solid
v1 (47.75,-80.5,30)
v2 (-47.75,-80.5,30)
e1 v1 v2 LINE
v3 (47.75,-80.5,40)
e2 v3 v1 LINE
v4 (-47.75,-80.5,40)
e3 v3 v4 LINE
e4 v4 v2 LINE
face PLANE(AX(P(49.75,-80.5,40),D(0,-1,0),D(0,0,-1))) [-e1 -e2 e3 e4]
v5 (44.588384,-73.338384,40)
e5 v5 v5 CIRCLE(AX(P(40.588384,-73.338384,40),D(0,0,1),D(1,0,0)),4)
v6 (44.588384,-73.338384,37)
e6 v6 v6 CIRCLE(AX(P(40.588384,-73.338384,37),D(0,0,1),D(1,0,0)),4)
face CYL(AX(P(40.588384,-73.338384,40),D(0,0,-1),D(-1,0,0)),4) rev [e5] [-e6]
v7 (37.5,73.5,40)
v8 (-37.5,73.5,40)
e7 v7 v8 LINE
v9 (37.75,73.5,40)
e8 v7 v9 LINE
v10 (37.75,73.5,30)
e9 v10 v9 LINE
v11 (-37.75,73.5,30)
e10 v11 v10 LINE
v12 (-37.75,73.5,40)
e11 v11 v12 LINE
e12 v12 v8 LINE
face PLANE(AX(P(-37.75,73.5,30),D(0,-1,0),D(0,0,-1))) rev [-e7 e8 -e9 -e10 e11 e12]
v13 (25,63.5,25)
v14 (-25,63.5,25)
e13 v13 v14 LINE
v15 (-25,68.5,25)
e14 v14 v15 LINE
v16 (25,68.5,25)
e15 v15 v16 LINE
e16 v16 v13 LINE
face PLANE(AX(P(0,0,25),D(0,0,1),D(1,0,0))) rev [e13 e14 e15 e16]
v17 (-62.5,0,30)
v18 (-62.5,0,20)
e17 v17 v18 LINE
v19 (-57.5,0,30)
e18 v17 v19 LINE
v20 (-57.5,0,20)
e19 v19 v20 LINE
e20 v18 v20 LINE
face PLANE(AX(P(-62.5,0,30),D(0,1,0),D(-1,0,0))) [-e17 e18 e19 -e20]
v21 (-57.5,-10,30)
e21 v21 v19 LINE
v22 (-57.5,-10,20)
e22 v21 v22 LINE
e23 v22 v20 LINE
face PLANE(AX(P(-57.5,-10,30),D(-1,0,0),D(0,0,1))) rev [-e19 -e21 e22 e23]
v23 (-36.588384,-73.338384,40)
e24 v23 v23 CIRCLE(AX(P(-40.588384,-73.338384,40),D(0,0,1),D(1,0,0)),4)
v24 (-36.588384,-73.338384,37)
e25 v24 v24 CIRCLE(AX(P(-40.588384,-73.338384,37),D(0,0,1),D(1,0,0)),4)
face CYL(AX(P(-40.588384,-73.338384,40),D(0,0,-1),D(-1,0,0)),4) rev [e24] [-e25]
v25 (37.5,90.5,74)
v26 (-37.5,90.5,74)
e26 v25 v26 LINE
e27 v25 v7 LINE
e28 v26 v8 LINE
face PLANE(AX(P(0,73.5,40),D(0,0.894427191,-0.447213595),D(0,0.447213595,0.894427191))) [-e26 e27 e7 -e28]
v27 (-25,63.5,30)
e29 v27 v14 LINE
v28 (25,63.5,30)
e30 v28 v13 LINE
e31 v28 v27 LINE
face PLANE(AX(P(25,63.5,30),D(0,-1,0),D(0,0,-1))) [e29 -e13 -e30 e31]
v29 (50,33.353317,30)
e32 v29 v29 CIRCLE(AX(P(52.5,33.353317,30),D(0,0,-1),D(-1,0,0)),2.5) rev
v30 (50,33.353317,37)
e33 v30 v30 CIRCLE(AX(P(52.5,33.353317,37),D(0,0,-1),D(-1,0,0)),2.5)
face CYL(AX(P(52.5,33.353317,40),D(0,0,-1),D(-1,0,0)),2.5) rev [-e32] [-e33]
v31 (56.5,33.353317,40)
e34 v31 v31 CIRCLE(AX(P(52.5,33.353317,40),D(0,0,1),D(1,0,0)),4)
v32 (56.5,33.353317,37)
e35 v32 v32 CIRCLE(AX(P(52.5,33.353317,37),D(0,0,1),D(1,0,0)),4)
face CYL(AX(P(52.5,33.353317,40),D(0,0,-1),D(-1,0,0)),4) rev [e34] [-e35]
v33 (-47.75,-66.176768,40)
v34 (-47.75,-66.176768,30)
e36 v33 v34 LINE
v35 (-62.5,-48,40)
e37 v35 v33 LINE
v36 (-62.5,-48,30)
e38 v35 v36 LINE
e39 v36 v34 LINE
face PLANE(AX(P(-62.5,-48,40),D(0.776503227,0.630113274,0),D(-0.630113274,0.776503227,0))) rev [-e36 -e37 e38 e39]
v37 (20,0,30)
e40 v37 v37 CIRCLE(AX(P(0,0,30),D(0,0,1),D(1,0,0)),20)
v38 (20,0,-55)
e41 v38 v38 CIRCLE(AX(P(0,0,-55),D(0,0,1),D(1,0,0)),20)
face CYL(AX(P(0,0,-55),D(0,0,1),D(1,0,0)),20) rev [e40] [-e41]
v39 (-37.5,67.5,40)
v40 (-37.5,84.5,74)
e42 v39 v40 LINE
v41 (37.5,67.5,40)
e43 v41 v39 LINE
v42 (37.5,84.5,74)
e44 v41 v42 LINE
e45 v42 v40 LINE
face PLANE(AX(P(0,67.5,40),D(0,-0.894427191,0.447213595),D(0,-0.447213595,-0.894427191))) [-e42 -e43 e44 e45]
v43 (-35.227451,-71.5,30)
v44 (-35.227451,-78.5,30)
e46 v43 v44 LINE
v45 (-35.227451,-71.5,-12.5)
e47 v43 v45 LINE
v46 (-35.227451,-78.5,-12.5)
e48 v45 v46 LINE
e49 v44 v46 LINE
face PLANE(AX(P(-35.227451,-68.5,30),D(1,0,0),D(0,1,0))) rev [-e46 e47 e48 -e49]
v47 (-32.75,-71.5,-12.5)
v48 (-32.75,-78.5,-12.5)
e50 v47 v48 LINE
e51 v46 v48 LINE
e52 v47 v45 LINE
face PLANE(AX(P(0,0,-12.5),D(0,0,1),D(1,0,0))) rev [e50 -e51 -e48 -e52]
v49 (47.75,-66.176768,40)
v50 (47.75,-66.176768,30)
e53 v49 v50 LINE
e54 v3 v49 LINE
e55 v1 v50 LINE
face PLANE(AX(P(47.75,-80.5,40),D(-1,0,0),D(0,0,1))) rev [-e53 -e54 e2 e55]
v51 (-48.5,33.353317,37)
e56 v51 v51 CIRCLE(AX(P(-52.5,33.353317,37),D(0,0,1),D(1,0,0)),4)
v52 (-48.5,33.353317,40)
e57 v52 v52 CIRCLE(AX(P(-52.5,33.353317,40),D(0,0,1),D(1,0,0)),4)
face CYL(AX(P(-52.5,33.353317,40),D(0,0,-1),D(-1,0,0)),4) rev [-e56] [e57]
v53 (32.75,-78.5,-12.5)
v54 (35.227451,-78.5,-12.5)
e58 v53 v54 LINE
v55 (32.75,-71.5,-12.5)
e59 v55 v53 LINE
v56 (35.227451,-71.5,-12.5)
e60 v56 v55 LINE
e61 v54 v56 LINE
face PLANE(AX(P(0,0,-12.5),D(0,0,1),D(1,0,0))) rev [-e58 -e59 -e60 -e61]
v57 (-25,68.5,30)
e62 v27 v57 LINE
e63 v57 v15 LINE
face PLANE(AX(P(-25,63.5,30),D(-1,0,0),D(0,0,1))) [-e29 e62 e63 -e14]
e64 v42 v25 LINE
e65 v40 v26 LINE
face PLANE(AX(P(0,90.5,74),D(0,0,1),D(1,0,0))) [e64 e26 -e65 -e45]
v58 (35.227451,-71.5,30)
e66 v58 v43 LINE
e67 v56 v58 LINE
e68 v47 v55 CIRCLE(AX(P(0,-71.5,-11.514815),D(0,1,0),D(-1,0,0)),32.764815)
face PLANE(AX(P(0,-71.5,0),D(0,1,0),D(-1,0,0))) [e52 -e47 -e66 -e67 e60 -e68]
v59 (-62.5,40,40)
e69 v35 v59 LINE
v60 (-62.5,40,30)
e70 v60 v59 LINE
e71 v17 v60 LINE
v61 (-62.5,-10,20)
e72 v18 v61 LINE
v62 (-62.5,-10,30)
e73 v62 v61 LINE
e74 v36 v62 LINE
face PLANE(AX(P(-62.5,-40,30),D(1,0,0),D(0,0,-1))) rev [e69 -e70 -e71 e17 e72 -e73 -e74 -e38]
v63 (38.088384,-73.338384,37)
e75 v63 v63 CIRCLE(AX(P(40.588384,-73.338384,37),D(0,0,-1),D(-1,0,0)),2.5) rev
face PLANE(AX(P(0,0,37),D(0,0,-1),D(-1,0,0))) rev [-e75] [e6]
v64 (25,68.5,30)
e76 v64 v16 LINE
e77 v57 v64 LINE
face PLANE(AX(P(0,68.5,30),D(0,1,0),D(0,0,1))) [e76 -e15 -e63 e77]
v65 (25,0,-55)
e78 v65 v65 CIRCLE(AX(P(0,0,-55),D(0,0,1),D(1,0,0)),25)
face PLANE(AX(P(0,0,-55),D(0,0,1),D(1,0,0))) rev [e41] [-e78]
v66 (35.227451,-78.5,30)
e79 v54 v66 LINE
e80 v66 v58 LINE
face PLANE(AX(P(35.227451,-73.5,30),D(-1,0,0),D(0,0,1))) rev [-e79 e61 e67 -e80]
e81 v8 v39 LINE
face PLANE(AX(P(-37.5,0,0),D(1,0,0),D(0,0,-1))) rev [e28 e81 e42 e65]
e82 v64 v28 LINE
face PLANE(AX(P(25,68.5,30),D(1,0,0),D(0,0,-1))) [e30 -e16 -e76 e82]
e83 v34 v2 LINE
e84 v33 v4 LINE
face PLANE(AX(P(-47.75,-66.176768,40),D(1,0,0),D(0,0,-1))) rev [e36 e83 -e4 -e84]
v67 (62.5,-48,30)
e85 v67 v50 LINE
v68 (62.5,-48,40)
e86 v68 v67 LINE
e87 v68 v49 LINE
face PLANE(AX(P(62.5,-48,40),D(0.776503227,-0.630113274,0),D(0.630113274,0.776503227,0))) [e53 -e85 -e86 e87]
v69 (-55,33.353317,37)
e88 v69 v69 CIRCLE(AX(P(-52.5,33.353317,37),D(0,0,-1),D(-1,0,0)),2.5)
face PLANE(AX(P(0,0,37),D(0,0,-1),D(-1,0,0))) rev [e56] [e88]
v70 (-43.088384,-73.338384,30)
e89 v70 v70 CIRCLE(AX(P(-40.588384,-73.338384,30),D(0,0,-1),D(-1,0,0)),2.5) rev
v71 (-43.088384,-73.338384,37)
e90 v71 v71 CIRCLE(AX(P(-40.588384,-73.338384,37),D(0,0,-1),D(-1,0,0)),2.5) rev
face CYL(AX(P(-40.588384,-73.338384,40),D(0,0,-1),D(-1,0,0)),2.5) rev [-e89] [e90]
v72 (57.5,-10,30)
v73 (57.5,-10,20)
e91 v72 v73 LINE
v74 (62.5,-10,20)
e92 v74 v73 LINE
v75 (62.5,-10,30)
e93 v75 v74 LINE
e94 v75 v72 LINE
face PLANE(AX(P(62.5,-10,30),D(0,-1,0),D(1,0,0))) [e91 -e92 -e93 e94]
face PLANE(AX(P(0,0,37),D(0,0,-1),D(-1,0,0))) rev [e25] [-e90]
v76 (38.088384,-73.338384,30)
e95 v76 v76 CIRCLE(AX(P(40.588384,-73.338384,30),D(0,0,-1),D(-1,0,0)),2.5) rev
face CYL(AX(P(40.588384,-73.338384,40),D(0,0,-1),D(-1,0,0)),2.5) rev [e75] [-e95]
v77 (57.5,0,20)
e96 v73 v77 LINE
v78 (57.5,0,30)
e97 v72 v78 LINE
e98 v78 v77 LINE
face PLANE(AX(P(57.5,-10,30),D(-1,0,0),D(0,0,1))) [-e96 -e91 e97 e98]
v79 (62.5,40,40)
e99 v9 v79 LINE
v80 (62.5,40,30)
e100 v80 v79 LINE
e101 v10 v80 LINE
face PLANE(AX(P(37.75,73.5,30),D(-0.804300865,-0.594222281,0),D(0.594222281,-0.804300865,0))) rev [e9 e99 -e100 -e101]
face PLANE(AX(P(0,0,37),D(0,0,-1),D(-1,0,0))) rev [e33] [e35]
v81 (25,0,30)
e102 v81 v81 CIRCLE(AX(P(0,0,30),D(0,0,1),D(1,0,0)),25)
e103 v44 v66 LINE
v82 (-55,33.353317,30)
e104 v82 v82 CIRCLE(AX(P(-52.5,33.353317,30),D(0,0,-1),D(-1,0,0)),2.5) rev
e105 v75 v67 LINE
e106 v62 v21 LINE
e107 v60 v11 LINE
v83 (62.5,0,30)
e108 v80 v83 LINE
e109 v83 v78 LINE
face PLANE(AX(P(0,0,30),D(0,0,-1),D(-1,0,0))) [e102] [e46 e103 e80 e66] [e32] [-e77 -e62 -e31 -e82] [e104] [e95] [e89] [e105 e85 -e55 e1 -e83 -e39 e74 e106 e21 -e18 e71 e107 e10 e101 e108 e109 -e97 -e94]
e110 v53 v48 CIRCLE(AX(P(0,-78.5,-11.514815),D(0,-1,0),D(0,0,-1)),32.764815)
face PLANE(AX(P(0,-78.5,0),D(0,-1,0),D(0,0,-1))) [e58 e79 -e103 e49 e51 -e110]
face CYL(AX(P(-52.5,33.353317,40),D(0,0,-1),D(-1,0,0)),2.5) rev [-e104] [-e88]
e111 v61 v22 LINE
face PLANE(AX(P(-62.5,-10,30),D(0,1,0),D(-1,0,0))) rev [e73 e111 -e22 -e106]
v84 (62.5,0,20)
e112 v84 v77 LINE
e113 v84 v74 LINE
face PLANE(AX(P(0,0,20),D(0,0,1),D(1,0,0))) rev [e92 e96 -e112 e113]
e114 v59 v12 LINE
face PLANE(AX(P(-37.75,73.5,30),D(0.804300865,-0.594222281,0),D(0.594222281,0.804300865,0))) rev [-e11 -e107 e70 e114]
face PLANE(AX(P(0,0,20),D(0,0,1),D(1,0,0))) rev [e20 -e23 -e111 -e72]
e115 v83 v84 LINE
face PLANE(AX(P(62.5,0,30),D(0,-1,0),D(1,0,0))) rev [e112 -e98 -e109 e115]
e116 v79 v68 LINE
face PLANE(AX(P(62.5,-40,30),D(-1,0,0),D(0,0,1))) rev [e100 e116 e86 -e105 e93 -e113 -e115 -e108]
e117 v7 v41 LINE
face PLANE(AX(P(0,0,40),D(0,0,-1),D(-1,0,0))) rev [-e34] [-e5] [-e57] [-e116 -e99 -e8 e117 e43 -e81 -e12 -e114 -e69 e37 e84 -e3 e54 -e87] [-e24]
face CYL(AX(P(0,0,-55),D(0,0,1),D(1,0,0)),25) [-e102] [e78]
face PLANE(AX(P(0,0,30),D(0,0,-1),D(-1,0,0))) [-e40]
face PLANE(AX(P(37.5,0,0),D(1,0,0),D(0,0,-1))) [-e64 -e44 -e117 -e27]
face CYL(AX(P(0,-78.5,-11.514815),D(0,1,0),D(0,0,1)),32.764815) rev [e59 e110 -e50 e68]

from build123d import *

# Parameters (mm, degrees)
ESTRUSIONE_ESTRUSIONE1_DEPTH       = 30
ESTRUSIONE_ESTRUSIONE1_DEPTH_BACK  = 55
SCHIZZO1_R                         = 25
SCHIZZO1_R_2                       = 20
ESTRUSIONE_ESTRUSIONE2_DEPTH       = 10
ESTRUSIONE_ESTRUSIONE3_DEPTH       = 10
ESTRUSIONE_ESTRUSIONE5_DEPTH       = 42.5
TAGLIO_ESTRUSIONE1_DEPTH           = 26.5
SCHIZZO3D5_R                       = 2.5
TAGLIO_ESTRUSIONE2_DEPTH           = 35.5
SCHIZZO3D6_R                       = 4
TAGLIO_ESTRUSIONE3_DEPTH           = 3
ESTRUSIONE_ESTRUSIONE10_DEPTH      = 5
TAGLIO_ESTRUSIONE4_START           = -14
TAGLIO_ESTRUSIONE4_DEPTH           = 14
TAGLIO_ESTRUSIONE7_DEPTH           = 3
ESTRUSIONE_ESTRUSIONE11_START      = 30
ESTRUSIONE_ESTRUSIONE11_OUTLINE_R  = 4
ESTRUSIONE_ESTRUSIONE11_DEPTH      = 10
ESTRUSIONE_ESTRUSIONE12_DEPTH      = 10
ESTRUSIONE_ESTRUSIONE13_DEPTH      = 10
ESTRUSIONE_ESTRUSIONE14_DEPTH      = 10
TAGLIO_ESTRUSIONE11_DEPTH          = 80
SCHIZZO3D17_R                      = 4
TAGLIO_ESTRUSIONE12_DEPTH          = 3
TAGLIO_ESTRUSIONE13_START          = 30
TAGLIO_ESTRUSIONE13_OUTLINE_R      = 2.5
TAGLIO_ESTRUSIONE13_DEPTH          = 7
ESTRUSIONE_ESTRUSIONE15_DEPTH      = 5
ESTRUSIONE_ESTRUSIONE17_DEPTH      = 37.5
ESTRUSIONE_ESTRUSIONE17_DEPTH_BACK = 37.5


# Read off the part's stored shape, not the designer's step: Estrusione-Estrusione11, Taglio-Estrusione13
with BuildPart() as part:
    # Schizzo1 → Estrusione-Estrusione1 (new, two sides: drawn at the far end of the back side and taken through both)
    with BuildSketch(Plane.XY.offset(-ESTRUSIONE_ESTRUSIONE1_DEPTH_BACK)):
        Circle(SCHIZZO1_R)
        Circle(SCHIZZO1_R_2, mode=Mode.SUBTRACT)
    extrude(amount=ESTRUSIONE_ESTRUSIONE1_DEPTH + ESTRUSIONE_ESTRUSIONE1_DEPTH_BACK)

    # Schizzo3D1 → Estrusione-Estrusione2 (add)
    with BuildSketch(Plane(origin=(-37.75, 73.5, 30), x_dir=(0.4568693936855125, -0.889533786381064, 0), z_dir=(0, 0, -1))):
        Polygon((0, 0), (34.493639223, -67.159800872), (75.600538561, -73.870637396), (146.763241471, -37.321085901), (165.255105821, 0), (130.761466598, 67.159800872), (89.654567261, 73.870637396), (18.49186435, 37.321085901), align=None)
    extrude(amount=-ESTRUSIONE_ESTRUSIONE2_DEPTH)

    # Schizzo3D2 → Estrusione-Estrusione3 (add)
    with BuildSketch(Plane(origin=(62.5, 0, 30), x_dir=(-0.9968152785361251, -0.07974522228289001, 0), z_dir=(0, 0, 1))):
        Polygon((0, 0), (0.797452223, 9.968152785), (5.781528616, 9.569426674), (4.984076393, -0.398726111), align=None)
        Polygon((125.39936204, 0), (120.415285647, 0.398726111), (119.617833424, -9.569426674), (124.601909817, -9.968152785), align=None)
    extrude(amount=-ESTRUSIONE_ESTRUSIONE3_DEPTH)

    # Schizzo3D3 → Estrusione-Estrusione5 (add)
    with BuildSketch(Plane(origin=(35.227450684, -68.5, 30), x_dir=(-0.9974912873801348, -0.0707893466612134, 0), z_dir=(0, 0, 1))):
        Polygon((0, 0), (70.278150268, -4.987456437), (70.632097001, 0), (0.353946733, 4.987456437), align=None)
    extrude(amount=-ESTRUSIONE_ESTRUSIONE5_DEPTH)

    # Schizzo3D4 → Taglio-Estrusione1 (cut)
    with BuildSketch(Plane(origin=(32.75, -68.5, -12.5), x_dir=(-1, 0, 0), z_dir=(0, 1, 0))):
        with BuildLine():
            Line((0, 0), (65.5, 0))
            ThreePointArc((65.5, 0), (32.75, 32.75), (0, 0))
        make_face()
    extrude(amount=-TAGLIO_ESTRUSIONE1_DEPTH, mode=Mode.SUBTRACT)

    # Schizzo3D5 → Taglio-Estrusione2 (cut)
    with BuildSketch(Plane(origin=(-52.5, 33.353317087, 40), x_dir=(0.8440673996564301, -0.5362370975951146, 0), z_dir=(0, 0, -1))):
        with Locations(Location((0, 0, 0), (0, 0, 147.572152721))):
            Circle(SCHIZZO3D5_R)
        with Locations(Location((88.627076964, -56.304895247, 0), (0, 0, 147.572152721))):
            Circle(SCHIZZO3D5_R)
        with Locations(Location((124.397648864, 0, 0), (0, 0, 147.572152721))):
            Circle(SCHIZZO3D5_R)
        with Locations(Location((35.7705719, 56.304895247, 0), (0, 0, 147.572152721))):
            Circle(SCHIZZO3D5_R)
    extrude(amount=TAGLIO_ESTRUSIONE2_DEPTH, mode=Mode.SUBTRACT)

    # Schizzo3D6 → Taglio-Estrusione3 (cut)
    with BuildSketch(Plane(origin=(0, 73.5, 40), x_dir=(0, -1, 0), z_dir=(0, 0, -1))):
        with Locations(Location((40.146682913, 52.5, 0), (0, 0, 270))):
            Circle(SCHIZZO3D6_R)
        with Locations(Location((40.146682913, -52.5, 0), (0, 0, 270))):
            Circle(SCHIZZO3D6_R)
        with Locations(Location((106.853317087, -52.5, 0), (0, 0, 270))):
            Circle(SCHIZZO3D6_R)
        with Locations(Location((106.853317087, 52.5, 0), (0, 0, 270))):
            Circle(SCHIZZO3D6_R)
    extrude(amount=TAGLIO_ESTRUSIONE3_DEPTH, mode=Mode.SUBTRACT)

    # Schizzo3D7 → Estrusione-Estrusione10 (add)
    with BuildSketch(Plane(origin=(35.227450684, -73.5, -12.5), x_dir=(-0.8117651174974726, 0, 0.5839840700004706), z_dir=(0, 1, 0))):
        with BuildLine():
            Line((0, 0), (2.011108045, -1.446791734))
            ThreePointArc((2.011108045, -1.446791734), (47.721893936, 6.013037572), (55.181723242, -39.697748319))
            Line((55.181723242, -39.697748319), (57.192831287, -41.144540052))
            Line((57.192831287, -41.144540052), (82.012154262, -6.644522559))
            Line((82.012154262, -6.644522559), (84.059871804, -8.117651175))
            Line((84.059871804, -8.117651175), (89.899712504, 0))
            Line((89.899712504, 0), (28.611446133, 44.090797285))
            Line((28.611446133, 44.090797285), (22.771605433, 35.97314611))
            Line((22.771605433, 35.97314611), (24.819322975, 34.500017494))
            Line((24.819322975, 34.500017494), (0, 0))
        make_face()
    extrude(amount=-ESTRUSIONE_ESTRUSIONE10_DEPTH)

    # Schizzo3D8 → Taglio-Estrusione4 (cut)
    with BuildSketch(Plane(origin=(0, -78.5, 20.25), x_dir=(-0.707106781186551, 0, -0.7071067811865441), z_dir=(0, -1, 0)).offset(TAGLIO_ESTRUSIONE4_START)):
        with BuildLine():
            ThreePointArc((0, 46.315494168), (-0.707106781, -0.707106781), (46.315494168, 0))
            ThreePointArc((46.315494168, 0), (0, 0), (0, 46.315494168))
        make_face()
    extrude(amount=TAGLIO_ESTRUSIONE4_DEPTH, mode=Mode.SUBTRACT)

    # Schizzo3D9 → Taglio-Estrusione7 (cut)
    with BuildSketch(Plane(origin=(35.227450684, -68.5, -12.5), x_dir=(-0.8562730712113632, 0, 0.5165234046180869), z_dir=(0, -1, 0))):
        with BuildLine():
            Line((0, 0), (2.121374306, 1.279661262))
            ThreePointArc((2.121374306, 1.279661262), (13.749394894, 45.407843828), (58.20726047, 35.111944264))
            Line((58.20726047, 35.111944264), (60.328634776, 36.391605526))
            Line((60.328634776, 36.391605526), (82.280879472, 0))
            Line((82.280879472, 0), (21.952244696, -36.391605526))
            Line((21.952244696, -36.391605526), (0, 0))
        make_face()
    extrude(amount=TAGLIO_ESTRUSIONE7_DEPTH, mode=Mode.SUBTRACT)

    # Estrusione-Estrusione11 outline → Estrusione-Estrusione11 (add)
    with BuildSketch(Plane.XY.offset(ESTRUSIONE_ESTRUSIONE11_START)):
        with Locations((52.5, -33.353317087)):
            Circle(ESTRUSIONE_ESTRUSIONE11_OUTLINE_R)
        with Locations((-52.5, -33.353317087)):
            Circle(ESTRUSIONE_ESTRUSIONE11_OUTLINE_R)
    extrude(amount=ESTRUSIONE_ESTRUSIONE11_DEPTH)

    # Schizzo3D11 → Estrusione-Estrusione12 (add)
    with BuildSketch(Plane(origin=(-62.5, -40, 40), x_dir=(0.9979582700578467, -0.06386932928370219, 0), z_dir=(0, 0, -1))):
        Polygon((0, 0), (0.510954634, 7.98366616), (27.158436361, 36.840627497), (26.839089715, 31.850836147), align=None)
        Polygon((102.504285751, 32.018493137), (102.184939104, 27.028701786), (124.744783757, -7.98366616), (125.255738392, 0), align=None)
    extrude(amount=ESTRUSIONE_ESTRUSIONE12_DEPTH)

    # Schizzo3D12 → Estrusione-Estrusione13 (add)
    with BuildSketch(Plane(origin=(-37.75, -78.5, 40), x_dir=(0.9932296706390209, 0.11616721294023631, 0), z_dir=(0, 0, 1))):
        Polygon((0, 0), (-9.932296706, 1.161672129), (-8.770624577, 11.093968836), (1.161672129, 9.932296706), align=None)
        Polygon((74.988840133, -8.770624577), (84.92113684, -9.932296706), (86.082808969, 0), (76.150512263, 1.161672129), align=None)
    extrude(amount=-ESTRUSIONE_ESTRUSIONE13_DEPTH)

    # Schizzo3D15 → Estrusione-Estrusione14 (add)
    with BuildSketch(Plane(origin=(-49.75, -63.712121212, 40), x_dir=(0.9860632358712049, -0.16637095558783233, 0), z_dir=(0, 0, 1))):
        Polygon((0, 0), (4.627662115, -4.074759177), (2.768690441, -4.388409339), (4.432399997, -14.249041698), (98.601439022, 1.639384561), (96.937729467, 11.500016919), (95.078757792, 11.186366757), (98.113291969, 16.553910081), (100.573565494, 1.972126472), (100.906307405, 0), (2.793015436, -16.553910081), (2.460273525, -14.581783609), align=None)
    extrude(amount=-ESTRUSIONE_ESTRUSIONE14_DEPTH)

    # Schizzo3D16 → Taglio-Estrusione11 (cut)
    with BuildSketch(Plane(origin=(-49.75, -80.5, 40), x_dir=(0.9860632358712049, 0.16637095558783233, 0), z_dir=(0, 0, 1))):
        Polygon((0, 0), (1.972126472, -0.332741911), (4.35509632, 13.790870902), (2.793015436, 16.553910081), align=None)
        Polygon((98.113291969, -16.553910081), (96.141165497, -16.22116817), (98.524135346, -2.097555357), (100.906307405, 0), align=None)
    extrude(amount=-TAGLIO_ESTRUSIONE11_DEPTH, mode=Mode.SUBTRACT)

    # Schizzo3D17 → Taglio-Estrusione12 (cut)
    with BuildSketch(Plane(origin=(0, -80.5, 40), x_dir=(-0.9847878761773714, 0.17376086709631217, 0), z_dir=(0, 0, -1))):
        with Locations(Location((41.215356952, 0, 0), (0, 0, 169.993443701))):
            Circle(SCHIZZO3D17_R)
        with Locations(Location((-38.726539684, 14.10534554, 0), (0, 0, 169.993443701))):
            Circle(SCHIZZO3D17_R)
    extrude(amount=TAGLIO_ESTRUSIONE12_DEPTH, mode=Mode.SUBTRACT)

    # Taglio-Estrusione13 outline → Taglio-Estrusione13 (cut)
    with BuildSketch(Plane.XY.offset(TAGLIO_ESTRUSIONE13_START)):
        with Locations((-40.588383838, -73.338383838)):
            Circle(TAGLIO_ESTRUSIONE13_OUTLINE_R)
        with Locations((40.588383838, -73.338383838)):
            Circle(TAGLIO_ESTRUSIONE13_OUTLINE_R)
    extrude(amount=TAGLIO_ESTRUSIONE13_DEPTH, mode=Mode.SUBTRACT)

    # Schizzo3D19 → Estrusione-Estrusione15 (add)
    with BuildSketch(Plane(origin=(0, 68.5, 30), x_dir=(0.9805806756909201, -0.19611613513818418, 0), z_dir=(0, 0, -1))):
        Polygon((0, 0), (-24.514516892, 4.902903378), (-23.533936217, 9.805806757), (25.495097568, 0), (24.514516892, -4.902903378), align=None)
    extrude(amount=ESTRUSIONE_ESTRUSIONE15_DEPTH)

    # Schizzo3D21 → Estrusione-Estrusione17 (add, two sides: drawn at the far end of the back side and taken through both)
    with BuildSketch(Plane(origin=(0, 73.5, 40), x_dir=(0, 0.4472135954999578, 0.8944271909999159), z_dir=(1, 0, 0)).offset(-ESTRUSIONE_ESTRUSIONE17_DEPTH_BACK)):
        Polygon((0, 0), (38.013155617, 0), (35.329874044, 5.366563146), (-2.683281573, 5.366563146), align=None)
    extrude(amount=ESTRUSIONE_ESTRUSIONE17_DEPTH + ESTRUSIONE_ESTRUSIONE17_DEPTH_BACK)


solid = part.part
